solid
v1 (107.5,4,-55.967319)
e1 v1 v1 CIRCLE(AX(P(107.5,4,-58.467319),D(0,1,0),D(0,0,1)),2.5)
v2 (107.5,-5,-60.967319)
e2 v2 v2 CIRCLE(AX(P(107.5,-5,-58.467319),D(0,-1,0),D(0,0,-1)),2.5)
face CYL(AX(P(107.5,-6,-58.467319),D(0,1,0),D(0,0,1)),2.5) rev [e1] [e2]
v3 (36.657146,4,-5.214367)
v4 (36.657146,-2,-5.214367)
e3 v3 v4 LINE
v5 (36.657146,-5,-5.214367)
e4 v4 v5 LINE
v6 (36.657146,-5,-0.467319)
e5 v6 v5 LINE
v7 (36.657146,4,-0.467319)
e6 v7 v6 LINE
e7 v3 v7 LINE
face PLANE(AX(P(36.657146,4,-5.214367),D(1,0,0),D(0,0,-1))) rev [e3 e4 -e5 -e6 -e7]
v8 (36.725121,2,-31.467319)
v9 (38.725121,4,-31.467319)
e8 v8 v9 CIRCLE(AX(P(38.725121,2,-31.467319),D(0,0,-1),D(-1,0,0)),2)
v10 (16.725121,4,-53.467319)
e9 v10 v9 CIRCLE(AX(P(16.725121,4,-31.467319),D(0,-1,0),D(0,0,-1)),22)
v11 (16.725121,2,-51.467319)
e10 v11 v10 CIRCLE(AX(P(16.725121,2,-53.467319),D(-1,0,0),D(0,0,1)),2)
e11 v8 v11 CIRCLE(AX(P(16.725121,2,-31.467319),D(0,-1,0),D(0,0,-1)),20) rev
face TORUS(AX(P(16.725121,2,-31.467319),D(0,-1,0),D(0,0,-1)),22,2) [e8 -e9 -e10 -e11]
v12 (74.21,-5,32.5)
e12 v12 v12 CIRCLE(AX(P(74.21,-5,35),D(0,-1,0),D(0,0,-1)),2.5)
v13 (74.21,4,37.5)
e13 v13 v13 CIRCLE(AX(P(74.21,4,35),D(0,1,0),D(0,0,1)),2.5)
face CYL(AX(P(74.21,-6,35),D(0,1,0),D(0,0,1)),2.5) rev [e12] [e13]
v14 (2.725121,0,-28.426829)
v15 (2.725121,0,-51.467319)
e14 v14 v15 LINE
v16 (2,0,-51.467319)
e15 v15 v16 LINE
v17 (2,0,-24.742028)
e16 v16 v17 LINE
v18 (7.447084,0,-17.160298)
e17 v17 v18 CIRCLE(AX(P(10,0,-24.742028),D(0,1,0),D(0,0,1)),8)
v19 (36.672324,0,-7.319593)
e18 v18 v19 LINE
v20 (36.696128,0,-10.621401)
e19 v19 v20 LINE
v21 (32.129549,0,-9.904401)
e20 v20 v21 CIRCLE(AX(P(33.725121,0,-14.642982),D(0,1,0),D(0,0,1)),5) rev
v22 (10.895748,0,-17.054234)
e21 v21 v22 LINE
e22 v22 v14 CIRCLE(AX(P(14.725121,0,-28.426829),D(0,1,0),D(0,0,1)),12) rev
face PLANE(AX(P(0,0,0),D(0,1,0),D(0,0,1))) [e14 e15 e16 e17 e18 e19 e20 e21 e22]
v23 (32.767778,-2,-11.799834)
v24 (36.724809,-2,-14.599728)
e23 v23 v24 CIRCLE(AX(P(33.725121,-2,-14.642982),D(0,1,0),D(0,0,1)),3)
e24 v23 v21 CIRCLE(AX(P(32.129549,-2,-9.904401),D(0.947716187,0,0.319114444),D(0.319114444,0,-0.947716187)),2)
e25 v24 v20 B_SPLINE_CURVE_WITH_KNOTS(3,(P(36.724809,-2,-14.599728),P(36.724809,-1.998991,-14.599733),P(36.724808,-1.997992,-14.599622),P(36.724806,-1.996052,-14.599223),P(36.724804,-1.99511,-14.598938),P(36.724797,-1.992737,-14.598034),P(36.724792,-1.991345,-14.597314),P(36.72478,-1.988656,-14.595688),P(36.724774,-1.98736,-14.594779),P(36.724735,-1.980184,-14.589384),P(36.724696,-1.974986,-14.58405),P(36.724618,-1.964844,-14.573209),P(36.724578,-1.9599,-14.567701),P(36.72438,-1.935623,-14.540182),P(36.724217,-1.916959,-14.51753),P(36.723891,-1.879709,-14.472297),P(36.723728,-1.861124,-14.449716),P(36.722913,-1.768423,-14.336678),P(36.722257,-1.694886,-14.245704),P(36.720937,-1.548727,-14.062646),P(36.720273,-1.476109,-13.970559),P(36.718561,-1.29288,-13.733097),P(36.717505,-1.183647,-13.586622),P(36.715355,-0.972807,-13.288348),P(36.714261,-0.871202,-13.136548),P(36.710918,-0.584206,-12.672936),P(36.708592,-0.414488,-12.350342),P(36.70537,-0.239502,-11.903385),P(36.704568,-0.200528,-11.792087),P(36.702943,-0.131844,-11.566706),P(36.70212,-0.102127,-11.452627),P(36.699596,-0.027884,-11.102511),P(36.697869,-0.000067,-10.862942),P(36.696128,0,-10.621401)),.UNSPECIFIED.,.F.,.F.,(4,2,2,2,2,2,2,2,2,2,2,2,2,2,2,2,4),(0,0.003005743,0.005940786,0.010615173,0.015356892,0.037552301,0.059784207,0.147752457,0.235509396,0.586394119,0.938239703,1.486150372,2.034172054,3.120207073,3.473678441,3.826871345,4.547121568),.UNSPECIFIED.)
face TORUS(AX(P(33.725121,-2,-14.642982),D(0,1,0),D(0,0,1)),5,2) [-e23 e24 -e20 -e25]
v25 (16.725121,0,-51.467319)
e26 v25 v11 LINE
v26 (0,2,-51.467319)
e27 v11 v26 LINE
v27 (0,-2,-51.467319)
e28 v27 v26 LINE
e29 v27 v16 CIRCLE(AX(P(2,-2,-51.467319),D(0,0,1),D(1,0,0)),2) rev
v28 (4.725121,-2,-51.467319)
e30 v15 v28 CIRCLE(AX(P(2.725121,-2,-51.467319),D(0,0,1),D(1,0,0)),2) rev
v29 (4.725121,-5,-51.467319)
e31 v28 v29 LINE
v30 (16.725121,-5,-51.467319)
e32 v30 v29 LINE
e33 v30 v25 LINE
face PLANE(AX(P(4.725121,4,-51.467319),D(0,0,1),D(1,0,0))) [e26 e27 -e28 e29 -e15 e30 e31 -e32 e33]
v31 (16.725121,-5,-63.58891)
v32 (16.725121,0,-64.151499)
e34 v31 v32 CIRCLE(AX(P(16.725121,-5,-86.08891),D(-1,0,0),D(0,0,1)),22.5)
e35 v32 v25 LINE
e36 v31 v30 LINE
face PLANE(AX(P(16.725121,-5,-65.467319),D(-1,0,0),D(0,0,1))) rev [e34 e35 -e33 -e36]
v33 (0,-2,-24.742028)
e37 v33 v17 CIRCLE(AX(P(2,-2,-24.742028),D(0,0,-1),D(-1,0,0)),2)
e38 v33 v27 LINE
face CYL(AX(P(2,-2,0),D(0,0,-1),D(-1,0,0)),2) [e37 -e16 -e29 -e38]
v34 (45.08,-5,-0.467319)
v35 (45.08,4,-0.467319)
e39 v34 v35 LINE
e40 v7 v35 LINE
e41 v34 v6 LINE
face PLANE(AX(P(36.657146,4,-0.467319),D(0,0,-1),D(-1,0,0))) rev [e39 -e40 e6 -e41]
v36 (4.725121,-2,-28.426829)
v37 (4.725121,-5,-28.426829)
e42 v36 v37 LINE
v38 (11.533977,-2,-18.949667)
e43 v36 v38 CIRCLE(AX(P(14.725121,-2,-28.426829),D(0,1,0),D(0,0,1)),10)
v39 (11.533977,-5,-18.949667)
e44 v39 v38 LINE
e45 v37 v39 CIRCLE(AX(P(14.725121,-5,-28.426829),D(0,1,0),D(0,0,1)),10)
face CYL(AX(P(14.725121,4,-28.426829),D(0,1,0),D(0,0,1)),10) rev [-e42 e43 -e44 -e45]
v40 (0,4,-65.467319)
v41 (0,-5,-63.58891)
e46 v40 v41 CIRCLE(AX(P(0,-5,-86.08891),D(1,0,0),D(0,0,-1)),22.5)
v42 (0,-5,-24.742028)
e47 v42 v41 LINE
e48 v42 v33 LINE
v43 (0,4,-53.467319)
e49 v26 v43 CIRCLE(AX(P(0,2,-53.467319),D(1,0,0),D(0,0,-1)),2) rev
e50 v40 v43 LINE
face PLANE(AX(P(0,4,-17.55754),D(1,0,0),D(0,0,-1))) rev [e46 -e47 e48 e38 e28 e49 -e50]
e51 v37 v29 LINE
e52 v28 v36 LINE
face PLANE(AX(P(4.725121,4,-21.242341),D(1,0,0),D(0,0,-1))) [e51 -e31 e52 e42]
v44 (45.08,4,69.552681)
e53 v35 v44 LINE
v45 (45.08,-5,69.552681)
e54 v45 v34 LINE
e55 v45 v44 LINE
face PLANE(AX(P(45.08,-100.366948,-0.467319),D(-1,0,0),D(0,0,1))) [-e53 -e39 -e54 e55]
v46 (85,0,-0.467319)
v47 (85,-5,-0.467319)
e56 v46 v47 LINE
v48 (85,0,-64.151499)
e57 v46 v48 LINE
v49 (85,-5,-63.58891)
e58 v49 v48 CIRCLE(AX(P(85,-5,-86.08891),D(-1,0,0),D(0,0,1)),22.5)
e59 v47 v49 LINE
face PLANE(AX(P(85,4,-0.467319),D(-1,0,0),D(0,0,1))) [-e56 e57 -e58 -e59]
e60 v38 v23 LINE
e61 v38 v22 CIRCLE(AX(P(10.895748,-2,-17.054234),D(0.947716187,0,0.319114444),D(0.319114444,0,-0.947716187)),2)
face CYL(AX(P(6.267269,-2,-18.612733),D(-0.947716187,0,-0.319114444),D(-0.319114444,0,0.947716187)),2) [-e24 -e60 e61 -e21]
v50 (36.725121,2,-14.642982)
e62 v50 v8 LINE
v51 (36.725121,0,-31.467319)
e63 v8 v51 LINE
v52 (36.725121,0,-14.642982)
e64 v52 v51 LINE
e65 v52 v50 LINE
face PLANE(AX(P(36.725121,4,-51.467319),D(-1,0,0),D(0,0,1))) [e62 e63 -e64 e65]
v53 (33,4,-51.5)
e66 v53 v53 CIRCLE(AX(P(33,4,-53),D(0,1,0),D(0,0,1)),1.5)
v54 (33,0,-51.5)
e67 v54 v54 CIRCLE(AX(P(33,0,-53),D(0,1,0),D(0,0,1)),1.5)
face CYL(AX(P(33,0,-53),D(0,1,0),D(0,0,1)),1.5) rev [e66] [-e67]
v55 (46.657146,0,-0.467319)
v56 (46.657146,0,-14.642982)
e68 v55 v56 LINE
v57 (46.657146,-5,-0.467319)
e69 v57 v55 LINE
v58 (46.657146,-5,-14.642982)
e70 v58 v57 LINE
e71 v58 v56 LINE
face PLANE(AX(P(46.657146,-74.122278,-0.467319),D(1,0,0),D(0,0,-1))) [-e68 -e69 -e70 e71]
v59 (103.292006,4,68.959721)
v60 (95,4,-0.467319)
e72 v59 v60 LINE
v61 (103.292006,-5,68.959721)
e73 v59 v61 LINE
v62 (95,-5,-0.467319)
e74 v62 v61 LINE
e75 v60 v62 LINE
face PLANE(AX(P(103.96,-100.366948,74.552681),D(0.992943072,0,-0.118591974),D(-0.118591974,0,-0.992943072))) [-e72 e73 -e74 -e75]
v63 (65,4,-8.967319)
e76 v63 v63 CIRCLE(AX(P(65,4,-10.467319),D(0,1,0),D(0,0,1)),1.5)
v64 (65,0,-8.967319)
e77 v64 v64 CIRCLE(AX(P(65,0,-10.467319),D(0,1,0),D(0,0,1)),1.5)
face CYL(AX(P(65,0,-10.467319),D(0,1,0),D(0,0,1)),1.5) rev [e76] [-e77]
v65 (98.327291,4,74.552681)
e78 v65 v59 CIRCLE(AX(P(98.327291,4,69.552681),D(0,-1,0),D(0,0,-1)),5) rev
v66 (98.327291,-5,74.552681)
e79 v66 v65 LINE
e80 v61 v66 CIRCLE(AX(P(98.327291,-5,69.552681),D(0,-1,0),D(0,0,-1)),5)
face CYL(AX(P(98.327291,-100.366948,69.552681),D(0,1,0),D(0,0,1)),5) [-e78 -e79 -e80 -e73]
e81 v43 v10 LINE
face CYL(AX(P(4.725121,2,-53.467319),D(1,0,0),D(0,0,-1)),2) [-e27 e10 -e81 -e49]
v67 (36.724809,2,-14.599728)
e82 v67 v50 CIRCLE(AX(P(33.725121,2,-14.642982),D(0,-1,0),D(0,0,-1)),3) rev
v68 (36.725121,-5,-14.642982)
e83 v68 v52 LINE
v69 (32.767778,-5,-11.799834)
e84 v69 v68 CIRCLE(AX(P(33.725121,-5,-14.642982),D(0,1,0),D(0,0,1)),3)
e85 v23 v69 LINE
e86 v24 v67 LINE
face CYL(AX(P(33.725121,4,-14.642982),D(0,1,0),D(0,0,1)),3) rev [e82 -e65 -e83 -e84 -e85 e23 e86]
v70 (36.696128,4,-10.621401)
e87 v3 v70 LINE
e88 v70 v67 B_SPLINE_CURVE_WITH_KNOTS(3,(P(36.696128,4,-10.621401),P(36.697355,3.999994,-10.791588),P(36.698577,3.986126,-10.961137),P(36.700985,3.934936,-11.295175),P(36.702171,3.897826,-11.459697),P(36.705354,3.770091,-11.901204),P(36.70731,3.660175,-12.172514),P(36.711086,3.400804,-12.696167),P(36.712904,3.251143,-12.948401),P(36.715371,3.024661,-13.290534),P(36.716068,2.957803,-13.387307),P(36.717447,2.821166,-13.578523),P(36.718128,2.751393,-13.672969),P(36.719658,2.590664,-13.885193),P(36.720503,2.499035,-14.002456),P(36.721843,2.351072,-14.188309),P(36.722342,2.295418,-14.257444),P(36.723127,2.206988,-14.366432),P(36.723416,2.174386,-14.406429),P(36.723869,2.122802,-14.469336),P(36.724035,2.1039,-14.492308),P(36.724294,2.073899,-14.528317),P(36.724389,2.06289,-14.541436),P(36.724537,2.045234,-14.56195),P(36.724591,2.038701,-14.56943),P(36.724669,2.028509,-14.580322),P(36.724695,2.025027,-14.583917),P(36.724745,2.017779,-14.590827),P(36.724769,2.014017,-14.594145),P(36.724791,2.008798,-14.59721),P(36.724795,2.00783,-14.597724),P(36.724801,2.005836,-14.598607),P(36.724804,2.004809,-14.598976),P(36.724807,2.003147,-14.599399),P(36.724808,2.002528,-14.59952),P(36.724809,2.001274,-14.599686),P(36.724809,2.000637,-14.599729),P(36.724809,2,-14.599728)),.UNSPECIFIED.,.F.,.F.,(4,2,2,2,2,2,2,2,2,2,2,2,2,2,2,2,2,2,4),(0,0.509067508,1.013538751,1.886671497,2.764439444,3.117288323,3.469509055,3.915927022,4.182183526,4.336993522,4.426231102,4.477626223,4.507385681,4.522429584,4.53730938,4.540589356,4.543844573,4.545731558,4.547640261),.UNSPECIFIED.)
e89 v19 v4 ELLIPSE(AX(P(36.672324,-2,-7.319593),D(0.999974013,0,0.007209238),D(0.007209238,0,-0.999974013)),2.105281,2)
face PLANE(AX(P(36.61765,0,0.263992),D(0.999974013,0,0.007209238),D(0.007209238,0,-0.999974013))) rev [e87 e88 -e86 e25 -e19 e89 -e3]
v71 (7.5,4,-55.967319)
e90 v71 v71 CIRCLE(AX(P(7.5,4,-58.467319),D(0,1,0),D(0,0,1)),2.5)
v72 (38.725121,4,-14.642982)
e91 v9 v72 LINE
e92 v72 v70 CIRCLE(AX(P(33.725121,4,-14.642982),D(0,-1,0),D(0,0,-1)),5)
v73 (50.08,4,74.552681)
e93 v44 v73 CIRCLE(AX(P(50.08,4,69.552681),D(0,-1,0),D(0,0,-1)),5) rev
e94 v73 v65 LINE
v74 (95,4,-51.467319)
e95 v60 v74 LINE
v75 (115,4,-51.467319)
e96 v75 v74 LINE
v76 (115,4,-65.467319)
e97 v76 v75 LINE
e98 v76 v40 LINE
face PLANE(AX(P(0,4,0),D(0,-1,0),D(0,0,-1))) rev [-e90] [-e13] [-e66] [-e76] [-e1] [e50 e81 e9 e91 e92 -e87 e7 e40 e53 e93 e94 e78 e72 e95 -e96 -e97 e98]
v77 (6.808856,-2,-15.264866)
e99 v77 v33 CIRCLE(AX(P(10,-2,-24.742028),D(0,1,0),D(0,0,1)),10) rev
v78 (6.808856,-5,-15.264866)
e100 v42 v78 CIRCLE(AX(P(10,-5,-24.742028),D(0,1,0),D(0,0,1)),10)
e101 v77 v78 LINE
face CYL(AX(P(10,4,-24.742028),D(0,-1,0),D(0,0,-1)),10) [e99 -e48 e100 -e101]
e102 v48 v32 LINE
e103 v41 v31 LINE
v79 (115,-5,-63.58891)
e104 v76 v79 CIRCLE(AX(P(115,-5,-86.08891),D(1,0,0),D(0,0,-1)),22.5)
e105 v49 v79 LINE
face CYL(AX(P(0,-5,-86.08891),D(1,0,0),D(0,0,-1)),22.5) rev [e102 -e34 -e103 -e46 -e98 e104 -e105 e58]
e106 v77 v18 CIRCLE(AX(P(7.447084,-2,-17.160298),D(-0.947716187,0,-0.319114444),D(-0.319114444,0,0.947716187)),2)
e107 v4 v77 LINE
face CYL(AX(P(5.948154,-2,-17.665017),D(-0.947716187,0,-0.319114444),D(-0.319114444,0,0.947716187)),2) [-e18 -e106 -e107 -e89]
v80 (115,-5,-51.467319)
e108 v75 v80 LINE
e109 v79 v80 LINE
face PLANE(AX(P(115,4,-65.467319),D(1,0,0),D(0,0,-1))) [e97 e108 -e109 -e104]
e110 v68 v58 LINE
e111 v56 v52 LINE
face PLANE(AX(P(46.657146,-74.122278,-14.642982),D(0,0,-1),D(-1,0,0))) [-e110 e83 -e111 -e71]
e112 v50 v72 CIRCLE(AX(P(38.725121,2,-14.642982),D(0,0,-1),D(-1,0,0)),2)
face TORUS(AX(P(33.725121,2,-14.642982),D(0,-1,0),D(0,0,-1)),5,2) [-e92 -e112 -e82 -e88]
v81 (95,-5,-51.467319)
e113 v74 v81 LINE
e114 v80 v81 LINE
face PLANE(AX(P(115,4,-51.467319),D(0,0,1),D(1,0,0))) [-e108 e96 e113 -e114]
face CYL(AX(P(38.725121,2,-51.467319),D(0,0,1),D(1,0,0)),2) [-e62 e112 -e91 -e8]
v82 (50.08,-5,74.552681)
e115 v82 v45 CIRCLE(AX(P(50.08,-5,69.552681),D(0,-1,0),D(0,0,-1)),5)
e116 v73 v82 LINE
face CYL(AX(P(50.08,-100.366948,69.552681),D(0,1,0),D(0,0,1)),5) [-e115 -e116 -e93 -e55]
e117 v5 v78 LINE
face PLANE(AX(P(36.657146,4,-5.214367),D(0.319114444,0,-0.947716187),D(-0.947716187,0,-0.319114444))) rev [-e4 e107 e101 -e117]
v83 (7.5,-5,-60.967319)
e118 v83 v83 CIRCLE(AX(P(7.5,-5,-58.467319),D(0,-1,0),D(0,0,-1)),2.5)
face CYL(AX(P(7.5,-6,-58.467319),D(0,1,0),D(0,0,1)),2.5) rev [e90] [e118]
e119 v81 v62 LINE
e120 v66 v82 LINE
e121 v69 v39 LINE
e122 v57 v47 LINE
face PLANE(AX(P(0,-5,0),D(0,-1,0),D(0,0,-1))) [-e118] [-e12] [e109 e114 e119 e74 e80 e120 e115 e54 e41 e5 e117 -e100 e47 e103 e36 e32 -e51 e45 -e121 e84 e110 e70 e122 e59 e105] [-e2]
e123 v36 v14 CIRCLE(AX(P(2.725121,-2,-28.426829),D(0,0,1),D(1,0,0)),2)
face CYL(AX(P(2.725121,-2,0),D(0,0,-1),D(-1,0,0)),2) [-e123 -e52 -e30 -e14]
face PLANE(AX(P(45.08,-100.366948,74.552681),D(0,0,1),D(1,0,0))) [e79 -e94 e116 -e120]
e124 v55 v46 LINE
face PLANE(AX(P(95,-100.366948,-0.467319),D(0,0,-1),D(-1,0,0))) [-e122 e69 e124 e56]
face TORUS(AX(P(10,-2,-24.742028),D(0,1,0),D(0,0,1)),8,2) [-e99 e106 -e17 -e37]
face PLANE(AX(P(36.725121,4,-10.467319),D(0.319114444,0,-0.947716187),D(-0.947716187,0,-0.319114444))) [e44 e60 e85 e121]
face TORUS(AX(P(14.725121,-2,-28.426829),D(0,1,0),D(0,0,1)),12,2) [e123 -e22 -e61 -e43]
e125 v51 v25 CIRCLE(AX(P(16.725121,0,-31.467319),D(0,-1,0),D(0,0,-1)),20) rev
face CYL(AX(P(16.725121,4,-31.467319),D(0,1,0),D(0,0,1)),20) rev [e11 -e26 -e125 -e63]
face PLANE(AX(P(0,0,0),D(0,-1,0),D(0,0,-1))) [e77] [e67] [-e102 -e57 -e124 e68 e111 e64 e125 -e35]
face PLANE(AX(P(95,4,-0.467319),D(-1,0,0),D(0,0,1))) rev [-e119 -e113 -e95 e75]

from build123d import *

# Parameters (mm, degrees)
SALIENTE_EXTRUIR1_DEPTH      = 4
REDONDEO1_R                  = 20
REDONDEO2_R                  = 10
REDONDEO3_R                  = 3
CROQUIS2_R                   = 1.5
CORTAR_EXTRUIR1_DEPTH        = 4
SALIENTE_EXTRUIR2_DEPTH      = 5
SALIENTE_EXTRUIR2_DEPTH_BACK = 4
CROQUIS4_W                   = 16.725121099
CROQUIS4_H                   = 14
SALIENTE_EXTRUIR3_DEPTH      = 5
SALIENTE_EXTRUIR4_DEPTH      = 5
CORTAR_EXTRUIR2_START        = -4
CORTAR_EXTRUIR2_DEPTH        = 4
SALIENTE_EXTRUIR5_DEPTH      = 9
REDONDEO4_R                  = 5
CORTAR_EXTRUIR3_DEPTH        = 115
CROQUIS10_R                  = 2.5
CORTAR_EXTRUIR4_DEPTH        = 10
REDONDEO5_R                  = 2


with BuildPart() as part:
    # Croquis1 → Saliente-Extruir1 (new body)
    with BuildSketch(Plane(origin=(0, 0, 0), x_dir=(1, 0, 0), z_dir=(0, 1, 0))):
        Polygon((36.657146199, 0.467319271), (95, 0.467319271), (95, 65.467319271), (0, 65.467319271), (0, 17.557539605), (36.657146199, 5.214366653), align=None)
        Polygon((4.725121099, 51.467319271), (36.725121099, 51.467319271), (36.725121099, 10.467319271), (4.725121099, 21.242340663), align=None, mode=Mode.SUBTRACT)
    extrude(amount=SALIENTE_EXTRUIR1_DEPTH)

    # Redondeo1
    redondeo1_edges = [part.edges().sort_by_distance(p)[0] for p in [
        (36.725121099, 2, -51.467319271),
    ]]
    fillet(redondeo1_edges, radius=REDONDEO1_R)

    # Redondeo2
    redondeo2_edges = [part.edges().sort_by_distance(p)[0] for p in [
        (0, 2, -17.557539605),
        (4.725121099, 2, -21.242340663),
    ]]
    fillet(redondeo2_edges, radius=REDONDEO2_R)

    # Redondeo3
    redondeo3_edges = [part.edges().sort_by_distance(p)[0] for p in [
        (36.725121099, 2, -10.467319271),
    ]]
    fillet(redondeo3_edges, radius=REDONDEO3_R)

    # Croquis2 → Cortar-Extruir1 (cut)
    with BuildSketch(Plane(origin=(0, 4, 0), x_dir=(1, 0, 0), z_dir=(0, 1, 0))):
        with Locations(Location((33, 53, 0), (0, 0, 270))):
            Circle(CROQUIS2_R)
        with Locations(Location((65, 10.467319271, 0), (0, 0, 270))):
            Circle(CROQUIS2_R)
    extrude(amount=-CORTAR_EXTRUIR1_DEPTH, mode=Mode.SUBTRACT)

    # Croquis3 → Saliente-Extruir2 (add, two sides: drawn at the far end of the back side and taken through both)
    with BuildSketch(Plane.XZ.offset(-SALIENTE_EXTRUIR2_DEPTH_BACK)):
        Polygon((95, -0.467319271), (95, -51.467319271), (115, -51.467319271), (115, -65.467319271), (85, -65.467319271), (85, -0.467319271), align=None)
    extrude(amount=SALIENTE_EXTRUIR2_DEPTH + SALIENTE_EXTRUIR2_DEPTH_BACK)

    # Croquis4 → Saliente-Extruir3 (add)
    with BuildSketch(Plane.XZ):
        with Locations((8.36256055, -58.467319271)):
            Rectangle(CROQUIS4_W, CROQUIS4_H)
    extrude(amount=SALIENTE_EXTRUIR3_DEPTH)

    # Croquis5 → Saliente-Extruir4 (add)
    with BuildSketch(Plane.XZ):
        with BuildLine():
            Line((6.808855565, -15.264865719), (36.657146199, -5.214366653))
            Line((36.657146199, -5.214366653), (36.657146199, -0.467319271))
            Line((36.657146199, -0.467319271), (46.657146199, -0.467319271))
            Line((46.657146199, -0.467319271), (46.657146199, -14.642982178))
            Line((46.657146199, -14.642982178), (36.725121099, -14.642982178))
            ThreePointArc((36.725121099, -14.642982178), (35.475545335, -12.206588327), (32.767777769, -11.799833616))
            Line((32.767777769, -11.799833616), (11.533976664, -18.949666776))
            ThreePointArc((11.533976664, -18.949666776), (6.603808263, -22.592081199), (4.725121099, -28.426828651))
            Line((4.725121099, -28.426828651), (4.725121099, -51.467319271))
            Line((4.725121099, -51.467319271), (0, -51.467319271))
            Line((0, -51.467319271), (0, -24.742027593))
            ThreePointArc((0, -24.742027593), (1.878687164, -18.907280142), (6.808855565, -15.264865719))
        make_face()
    extrude(amount=SALIENTE_EXTRUIR4_DEPTH)

    # Cortar-Extruir2: read off the stored shape, not the designer's step
    # Cortar-Extruir2 outline → Cortar-Extruir2 (cut)
    with BuildSketch(Plane(origin=(0, 4, 0), x_dir=(1, 0, 0), z_dir=(0, 1, 0)).offset(CORTAR_EXTRUIR2_START)):
        with BuildLine():
            Line((4.725121099, 51.467319271), (0, 51.467319271))
            Line((0, 51.467319271), (0, 24.742027593))
            ThreePointArc((0, 24.742027593), (1.878687164, 18.907280142), (6.808855565, 15.264865719))
            Line((6.808855565, 15.264865719), (36.657146199, 5.214366653))
            Line((36.657146199, 5.214366653), (36.72480926, 14.599727874))
            ThreePointArc((36.72480926, 14.599727874), (35.457935304, 12.194032416), (32.767777769, 11.799833616))
            Line((32.767777769, 11.799833616), (11.533976664, 18.949666776))
            ThreePointArc((11.533976664, 18.949666776), (6.603808263, 22.592081199), (4.725121099, 28.426828651))
            Line((4.725121099, 28.426828651), (4.725121099, 51.467319271))
        make_face()
    extrude(amount=CORTAR_EXTRUIR2_DEPTH, mode=Mode.SUBTRACT)

    # Croquis8 → Saliente-Extruir5 (add)
    with BuildSketch(Plane(origin=(0, 4, 0), x_dir=(1, 0, 0), z_dir=(0, 1, 0))):
        Polygon((45.08, -74.552680729), (103.96, -74.552680729), (95, 0.467319271), (45.08, 0.467319271), align=None)
    extrude(amount=-SALIENTE_EXTRUIR5_DEPTH)

    # Redondeo4
    redondeo4_edges = [part.edges().sort_by_distance(p)[0] for p in [
        (45.08, -0.5, 74.552680729),
        (103.96, -0.5, 74.552680729),
    ]]
    fillet(redondeo4_edges, radius=REDONDEO4_R)

    # Croquis9 → Cortar-Extruir3 (cut)
    with BuildSketch(Plane(origin=(115, 0, 0), x_dir=(0, 0, -1), z_dir=(1, 0, 0))):
        with BuildLine():
            Line((65.467319271, 4), (65.467319271, -5))
            Line((65.467319271, -5), (63.588909898, -5))
            ThreePointArc((63.588909898, -5), (64.063517857, -0.403033017), (65.467319271, 4))
        make_face()
    extrude(amount=-CORTAR_EXTRUIR3_DEPTH, mode=Mode.SUBTRACT)

    # Croquis10 → Cortar-Extruir4 (cut)
    with BuildSketch(Plane(origin=(0, 4, 0), x_dir=(1, 0, 0), z_dir=(0, 1, 0))):
        with Locations(Location((7.5, 58.467319271, 0), (0, 0, 270))):
            Circle(CROQUIS10_R)
        with Locations(Location((107.5, 58.467319271, 0), (0, 0, 270))):
            Circle(CROQUIS10_R)
        with Locations(Location((74.21, -35, 0), (0, 0, 270))):
            Circle(CROQUIS10_R)
    extrude(amount=-CORTAR_EXTRUIR4_DEPTH, mode=Mode.SUBTRACT)

    # Redondeo5
    # the kernel refuses this fillet: 2 mm, written as the material it takes off along each edge
    with BuildSketch(Plane(origin=(6.808855565, 0, -15.264865719), x_dir=(-3.003248393768829e-11, -1.0, 8.919142254990751e-11), z_dir=(0.9477161874303269, 0, 0.31911444355046886))) as redondeo5_piece_1_section:
        with BuildLine():
            CenterArc((REDONDEO5_R, REDONDEO5_R), REDONDEO5_R, 180.000000005, 90)
            Line((-REDONDEO5_R * 9.41119543218e-11, REDONDEO5_R), (0, 0))
            Line((0, 0), (REDONDEO5_R, 0))
        make_face()
    redondeo5_piece_1 = extrude(amount=36.494967618, mode=Mode.PRIVATE)
    redondeo5_piece_1 = split(redondeo5_piece_1, bisect_by=Plane(origin=(36.728049447, 0, -15.049165525), z_dir=(-0.9999740131061556, 0, -0.007209237988178882)), keep=Keep.TOP, mode=Mode.PRIVATE)
    add(redondeo5_piece_1, mode=Mode.SUBTRACT)
    with BuildSketch(Plane(origin=(9.999999999, 0, -24.742027593), x_dir=(-1.0, 0, 6.147260478780798e-12), z_dir=(-6.147260478780798e-12, 0, -1.0))) as redondeo5_piece_2:
        with BuildLine():
            CenterArc((9.999999999 - REDONDEO5_R, -REDONDEO5_R), REDONDEO5_R, 0, 90)
            Line((9.999999999 + REDONDEO5_R * 5.85513859619e-11, -REDONDEO5_R), (9.999999999, 0))
            Line((9.999999999, 0), (9.999999999 - REDONDEO5_R, 0))
        make_face()
    revolve(axis=Axis((9.999999999, 0, -24.742027593), (0, 1, 0)), revolution_arc=71.390621361, mode=Mode.SUBTRACT)
    with BuildSketch(Plane(origin=(0, 0, -51.467319271), x_dir=(0, -1, 0), z_dir=(0, 0, 1))) as redondeo5_piece_3:
        with BuildLine():
            CenterArc((REDONDEO5_R, REDONDEO5_R), REDONDEO5_R, 180, 90)
            Line((0, REDONDEO5_R), (0, 0))
            Line((0, 0), (REDONDEO5_R, 0))
        make_face()
    extrude(amount=26.725291678, mode=Mode.SUBTRACT)
    with BuildSketch(Plane(origin=(4.725121099, 0, -28.426828651), x_dir=(-1, 0, 0), z_dir=(0, 0, -1))) as redondeo5_piece_4:
        with BuildLine():
            CenterArc((REDONDEO5_R, -REDONDEO5_R), REDONDEO5_R, 90, 90)
            Line((-REDONDEO5_R * 1.16604059741e-10, -REDONDEO5_R), (0, 0))
            Line((0, 0), (REDONDEO5_R, 0))
        make_face()
    extrude(amount=23.04049062, mode=Mode.SUBTRACT)
    with BuildSketch(Plane(origin=(14.725121098, 0, -28.42682865), x_dir=(-0.3191144434609787, 0, 0.94771618746046), z_dir=(0.94771618746046, 0, 0.3191144434609787))) as redondeo5_piece_5:
        with BuildLine():
            CenterArc((9.999999999 + REDONDEO5_R, REDONDEO5_R), REDONDEO5_R, 180, 90)
            Line((9.999999999 - REDONDEO5_R * 2.13431938789e-10, REDONDEO5_R), (9.999999999, 0))
            Line((9.999999999, 0), (9.999999999 + REDONDEO5_R, 0))
        make_face()
    revolve(axis=Axis((14.725121098, 0, -28.42682865), (0, -1, 0)), revolution_arc=71.390621366, mode=Mode.SUBTRACT)
    with BuildSketch(Plane(origin=(32.767777769, 0, -11.799833616), x_dir=(-0.3191144435113306, 0, 0.9477161874435055), z_dir=(-0.9477161874435056, 0, -0.3191144435113306))) as redondeo5_piece_6:
        with BuildLine():
            CenterArc((REDONDEO5_R, -REDONDEO5_R), REDONDEO5_R, 90, 90)
            Line((0, -REDONDEO5_R), (0, 0))
            Line((0, 0), (REDONDEO5_R, 0))
        make_face()
    extrude(amount=22.405232058, mode=Mode.SUBTRACT)
    with BuildSketch(Plane(origin=(33.725121101, 0, -14.642982175), x_dir=(-0.08231883672192833, 0, -0.996606045095427), z_dir=(-0.996606045095427, 0, 0.08231883672192833))) as redondeo5_piece_7_section:
        with BuildLine():
            CenterArc((2.999999998 + REDONDEO5_R, REDONDEO5_R), REDONDEO5_R, 180, 90)
            Line((2.999999998 + REDONDEO5_R, 0), (2.999999998, 0))
            Line((2.999999998, 0), (2.999999998 - REDONDEO5_R * 4.36447322727e-10, REDONDEO5_R))
        make_face()
    redondeo5_piece_7 = revolve(axis=Axis((33.725121101, 0, -14.642982175), (0, -1, 0)), revolution_arc=203.331243748, mode=Mode.PRIVATE)
    redondeo5_piece_7 = split(redondeo5_piece_7, bisect_by=Plane(origin=(36.724965179, 0, -14.621355023), z_dir=(-0.9999740131061556, 0, -0.007209237988178882)), keep=Keep.TOP, mode=Mode.PRIVATE)
    add(redondeo5_piece_7, mode=Mode.SUBTRACT)
    with BuildSketch(Plane(origin=(4.725121099, 4, -51.467319271), x_dir=(0, 0, -1), z_dir=(1, 0, 0))) as redondeo5_piece_8:
        with BuildLine():
            CenterArc((REDONDEO5_R, -REDONDEO5_R), REDONDEO5_R, 90, 90)
            Line((0, -REDONDEO5_R), (0, 0))
            Line((0, 0), (REDONDEO5_R, 0))
        make_face()
    extrude(amount=12, mode=Mode.SUBTRACT)
    with BuildSketch(Plane(origin=(16.725121099, 4, -31.467319271), x_dir=(0, 0, -1), z_dir=(-1, 0, 0))) as redondeo5_piece_9:
        with BuildLine():
            CenterArc((20 + REDONDEO5_R, REDONDEO5_R), REDONDEO5_R, 180, 90)
            Line((20, REDONDEO5_R), (20, 0))
            Line((20, 0), (20 + REDONDEO5_R, 0))
        make_face()
    revolve(axis=Axis((16.725121099, 4, -31.467319271), (0, -1, 0)), revolution_arc=90, mode=Mode.SUBTRACT)
    with BuildSketch(Plane(origin=(36.725121099, 4, -31.467319271), x_dir=(1, 0, 0), z_dir=(0, 0, 1))) as redondeo5_piece_10:
        with BuildLine():
            CenterArc((REDONDEO5_R, -REDONDEO5_R), REDONDEO5_R, 90, 90)
            Line((0, -REDONDEO5_R), (0, 0))
            Line((0, 0), (REDONDEO5_R, 0))
        make_face()
    extrude(amount=16.824337093, mode=Mode.SUBTRACT)
    with BuildSketch(Plane(origin=(33.725121099, 4, -14.642982178), x_dir=(-0.11006554678443577, 0, 0.9939243308275753), z_dir=(-0.9939243308275753, 0, -0.11006554678443577))) as redondeo5_piece_11:
        with BuildLine():
            CenterArc((3 + REDONDEO5_R, -REDONDEO5_R), REDONDEO5_R, 90, 90)
            Line((3, -REDONDEO5_R), (3, 0))
            Line((3, 0), (3 + REDONDEO5_R, 0))
        make_face()
    revolve(axis=Axis((33.725121099, 4, -14.642982178), (0, 1, 0)), revolution_arc=96.319094067, mode=Mode.SUBTRACT)
    with BuildSketch(Plane(origin=(4.725121099, 4, -51.467319271), x_dir=(0, 0, -1), z_dir=(-1, 0, 0))) as redondeo5_piece_12:
        with BuildLine():
            CenterArc((REDONDEO5_R, REDONDEO5_R), REDONDEO5_R, 180, 90)
            Line((-REDONDEO5_R * 1.79170456249e-10, REDONDEO5_R), (0, 0))
            Line((0, 0), (REDONDEO5_R, 0))
        make_face()
    extrude(amount=9.725121099, mode=Mode.SUBTRACT)


solid = part.part
